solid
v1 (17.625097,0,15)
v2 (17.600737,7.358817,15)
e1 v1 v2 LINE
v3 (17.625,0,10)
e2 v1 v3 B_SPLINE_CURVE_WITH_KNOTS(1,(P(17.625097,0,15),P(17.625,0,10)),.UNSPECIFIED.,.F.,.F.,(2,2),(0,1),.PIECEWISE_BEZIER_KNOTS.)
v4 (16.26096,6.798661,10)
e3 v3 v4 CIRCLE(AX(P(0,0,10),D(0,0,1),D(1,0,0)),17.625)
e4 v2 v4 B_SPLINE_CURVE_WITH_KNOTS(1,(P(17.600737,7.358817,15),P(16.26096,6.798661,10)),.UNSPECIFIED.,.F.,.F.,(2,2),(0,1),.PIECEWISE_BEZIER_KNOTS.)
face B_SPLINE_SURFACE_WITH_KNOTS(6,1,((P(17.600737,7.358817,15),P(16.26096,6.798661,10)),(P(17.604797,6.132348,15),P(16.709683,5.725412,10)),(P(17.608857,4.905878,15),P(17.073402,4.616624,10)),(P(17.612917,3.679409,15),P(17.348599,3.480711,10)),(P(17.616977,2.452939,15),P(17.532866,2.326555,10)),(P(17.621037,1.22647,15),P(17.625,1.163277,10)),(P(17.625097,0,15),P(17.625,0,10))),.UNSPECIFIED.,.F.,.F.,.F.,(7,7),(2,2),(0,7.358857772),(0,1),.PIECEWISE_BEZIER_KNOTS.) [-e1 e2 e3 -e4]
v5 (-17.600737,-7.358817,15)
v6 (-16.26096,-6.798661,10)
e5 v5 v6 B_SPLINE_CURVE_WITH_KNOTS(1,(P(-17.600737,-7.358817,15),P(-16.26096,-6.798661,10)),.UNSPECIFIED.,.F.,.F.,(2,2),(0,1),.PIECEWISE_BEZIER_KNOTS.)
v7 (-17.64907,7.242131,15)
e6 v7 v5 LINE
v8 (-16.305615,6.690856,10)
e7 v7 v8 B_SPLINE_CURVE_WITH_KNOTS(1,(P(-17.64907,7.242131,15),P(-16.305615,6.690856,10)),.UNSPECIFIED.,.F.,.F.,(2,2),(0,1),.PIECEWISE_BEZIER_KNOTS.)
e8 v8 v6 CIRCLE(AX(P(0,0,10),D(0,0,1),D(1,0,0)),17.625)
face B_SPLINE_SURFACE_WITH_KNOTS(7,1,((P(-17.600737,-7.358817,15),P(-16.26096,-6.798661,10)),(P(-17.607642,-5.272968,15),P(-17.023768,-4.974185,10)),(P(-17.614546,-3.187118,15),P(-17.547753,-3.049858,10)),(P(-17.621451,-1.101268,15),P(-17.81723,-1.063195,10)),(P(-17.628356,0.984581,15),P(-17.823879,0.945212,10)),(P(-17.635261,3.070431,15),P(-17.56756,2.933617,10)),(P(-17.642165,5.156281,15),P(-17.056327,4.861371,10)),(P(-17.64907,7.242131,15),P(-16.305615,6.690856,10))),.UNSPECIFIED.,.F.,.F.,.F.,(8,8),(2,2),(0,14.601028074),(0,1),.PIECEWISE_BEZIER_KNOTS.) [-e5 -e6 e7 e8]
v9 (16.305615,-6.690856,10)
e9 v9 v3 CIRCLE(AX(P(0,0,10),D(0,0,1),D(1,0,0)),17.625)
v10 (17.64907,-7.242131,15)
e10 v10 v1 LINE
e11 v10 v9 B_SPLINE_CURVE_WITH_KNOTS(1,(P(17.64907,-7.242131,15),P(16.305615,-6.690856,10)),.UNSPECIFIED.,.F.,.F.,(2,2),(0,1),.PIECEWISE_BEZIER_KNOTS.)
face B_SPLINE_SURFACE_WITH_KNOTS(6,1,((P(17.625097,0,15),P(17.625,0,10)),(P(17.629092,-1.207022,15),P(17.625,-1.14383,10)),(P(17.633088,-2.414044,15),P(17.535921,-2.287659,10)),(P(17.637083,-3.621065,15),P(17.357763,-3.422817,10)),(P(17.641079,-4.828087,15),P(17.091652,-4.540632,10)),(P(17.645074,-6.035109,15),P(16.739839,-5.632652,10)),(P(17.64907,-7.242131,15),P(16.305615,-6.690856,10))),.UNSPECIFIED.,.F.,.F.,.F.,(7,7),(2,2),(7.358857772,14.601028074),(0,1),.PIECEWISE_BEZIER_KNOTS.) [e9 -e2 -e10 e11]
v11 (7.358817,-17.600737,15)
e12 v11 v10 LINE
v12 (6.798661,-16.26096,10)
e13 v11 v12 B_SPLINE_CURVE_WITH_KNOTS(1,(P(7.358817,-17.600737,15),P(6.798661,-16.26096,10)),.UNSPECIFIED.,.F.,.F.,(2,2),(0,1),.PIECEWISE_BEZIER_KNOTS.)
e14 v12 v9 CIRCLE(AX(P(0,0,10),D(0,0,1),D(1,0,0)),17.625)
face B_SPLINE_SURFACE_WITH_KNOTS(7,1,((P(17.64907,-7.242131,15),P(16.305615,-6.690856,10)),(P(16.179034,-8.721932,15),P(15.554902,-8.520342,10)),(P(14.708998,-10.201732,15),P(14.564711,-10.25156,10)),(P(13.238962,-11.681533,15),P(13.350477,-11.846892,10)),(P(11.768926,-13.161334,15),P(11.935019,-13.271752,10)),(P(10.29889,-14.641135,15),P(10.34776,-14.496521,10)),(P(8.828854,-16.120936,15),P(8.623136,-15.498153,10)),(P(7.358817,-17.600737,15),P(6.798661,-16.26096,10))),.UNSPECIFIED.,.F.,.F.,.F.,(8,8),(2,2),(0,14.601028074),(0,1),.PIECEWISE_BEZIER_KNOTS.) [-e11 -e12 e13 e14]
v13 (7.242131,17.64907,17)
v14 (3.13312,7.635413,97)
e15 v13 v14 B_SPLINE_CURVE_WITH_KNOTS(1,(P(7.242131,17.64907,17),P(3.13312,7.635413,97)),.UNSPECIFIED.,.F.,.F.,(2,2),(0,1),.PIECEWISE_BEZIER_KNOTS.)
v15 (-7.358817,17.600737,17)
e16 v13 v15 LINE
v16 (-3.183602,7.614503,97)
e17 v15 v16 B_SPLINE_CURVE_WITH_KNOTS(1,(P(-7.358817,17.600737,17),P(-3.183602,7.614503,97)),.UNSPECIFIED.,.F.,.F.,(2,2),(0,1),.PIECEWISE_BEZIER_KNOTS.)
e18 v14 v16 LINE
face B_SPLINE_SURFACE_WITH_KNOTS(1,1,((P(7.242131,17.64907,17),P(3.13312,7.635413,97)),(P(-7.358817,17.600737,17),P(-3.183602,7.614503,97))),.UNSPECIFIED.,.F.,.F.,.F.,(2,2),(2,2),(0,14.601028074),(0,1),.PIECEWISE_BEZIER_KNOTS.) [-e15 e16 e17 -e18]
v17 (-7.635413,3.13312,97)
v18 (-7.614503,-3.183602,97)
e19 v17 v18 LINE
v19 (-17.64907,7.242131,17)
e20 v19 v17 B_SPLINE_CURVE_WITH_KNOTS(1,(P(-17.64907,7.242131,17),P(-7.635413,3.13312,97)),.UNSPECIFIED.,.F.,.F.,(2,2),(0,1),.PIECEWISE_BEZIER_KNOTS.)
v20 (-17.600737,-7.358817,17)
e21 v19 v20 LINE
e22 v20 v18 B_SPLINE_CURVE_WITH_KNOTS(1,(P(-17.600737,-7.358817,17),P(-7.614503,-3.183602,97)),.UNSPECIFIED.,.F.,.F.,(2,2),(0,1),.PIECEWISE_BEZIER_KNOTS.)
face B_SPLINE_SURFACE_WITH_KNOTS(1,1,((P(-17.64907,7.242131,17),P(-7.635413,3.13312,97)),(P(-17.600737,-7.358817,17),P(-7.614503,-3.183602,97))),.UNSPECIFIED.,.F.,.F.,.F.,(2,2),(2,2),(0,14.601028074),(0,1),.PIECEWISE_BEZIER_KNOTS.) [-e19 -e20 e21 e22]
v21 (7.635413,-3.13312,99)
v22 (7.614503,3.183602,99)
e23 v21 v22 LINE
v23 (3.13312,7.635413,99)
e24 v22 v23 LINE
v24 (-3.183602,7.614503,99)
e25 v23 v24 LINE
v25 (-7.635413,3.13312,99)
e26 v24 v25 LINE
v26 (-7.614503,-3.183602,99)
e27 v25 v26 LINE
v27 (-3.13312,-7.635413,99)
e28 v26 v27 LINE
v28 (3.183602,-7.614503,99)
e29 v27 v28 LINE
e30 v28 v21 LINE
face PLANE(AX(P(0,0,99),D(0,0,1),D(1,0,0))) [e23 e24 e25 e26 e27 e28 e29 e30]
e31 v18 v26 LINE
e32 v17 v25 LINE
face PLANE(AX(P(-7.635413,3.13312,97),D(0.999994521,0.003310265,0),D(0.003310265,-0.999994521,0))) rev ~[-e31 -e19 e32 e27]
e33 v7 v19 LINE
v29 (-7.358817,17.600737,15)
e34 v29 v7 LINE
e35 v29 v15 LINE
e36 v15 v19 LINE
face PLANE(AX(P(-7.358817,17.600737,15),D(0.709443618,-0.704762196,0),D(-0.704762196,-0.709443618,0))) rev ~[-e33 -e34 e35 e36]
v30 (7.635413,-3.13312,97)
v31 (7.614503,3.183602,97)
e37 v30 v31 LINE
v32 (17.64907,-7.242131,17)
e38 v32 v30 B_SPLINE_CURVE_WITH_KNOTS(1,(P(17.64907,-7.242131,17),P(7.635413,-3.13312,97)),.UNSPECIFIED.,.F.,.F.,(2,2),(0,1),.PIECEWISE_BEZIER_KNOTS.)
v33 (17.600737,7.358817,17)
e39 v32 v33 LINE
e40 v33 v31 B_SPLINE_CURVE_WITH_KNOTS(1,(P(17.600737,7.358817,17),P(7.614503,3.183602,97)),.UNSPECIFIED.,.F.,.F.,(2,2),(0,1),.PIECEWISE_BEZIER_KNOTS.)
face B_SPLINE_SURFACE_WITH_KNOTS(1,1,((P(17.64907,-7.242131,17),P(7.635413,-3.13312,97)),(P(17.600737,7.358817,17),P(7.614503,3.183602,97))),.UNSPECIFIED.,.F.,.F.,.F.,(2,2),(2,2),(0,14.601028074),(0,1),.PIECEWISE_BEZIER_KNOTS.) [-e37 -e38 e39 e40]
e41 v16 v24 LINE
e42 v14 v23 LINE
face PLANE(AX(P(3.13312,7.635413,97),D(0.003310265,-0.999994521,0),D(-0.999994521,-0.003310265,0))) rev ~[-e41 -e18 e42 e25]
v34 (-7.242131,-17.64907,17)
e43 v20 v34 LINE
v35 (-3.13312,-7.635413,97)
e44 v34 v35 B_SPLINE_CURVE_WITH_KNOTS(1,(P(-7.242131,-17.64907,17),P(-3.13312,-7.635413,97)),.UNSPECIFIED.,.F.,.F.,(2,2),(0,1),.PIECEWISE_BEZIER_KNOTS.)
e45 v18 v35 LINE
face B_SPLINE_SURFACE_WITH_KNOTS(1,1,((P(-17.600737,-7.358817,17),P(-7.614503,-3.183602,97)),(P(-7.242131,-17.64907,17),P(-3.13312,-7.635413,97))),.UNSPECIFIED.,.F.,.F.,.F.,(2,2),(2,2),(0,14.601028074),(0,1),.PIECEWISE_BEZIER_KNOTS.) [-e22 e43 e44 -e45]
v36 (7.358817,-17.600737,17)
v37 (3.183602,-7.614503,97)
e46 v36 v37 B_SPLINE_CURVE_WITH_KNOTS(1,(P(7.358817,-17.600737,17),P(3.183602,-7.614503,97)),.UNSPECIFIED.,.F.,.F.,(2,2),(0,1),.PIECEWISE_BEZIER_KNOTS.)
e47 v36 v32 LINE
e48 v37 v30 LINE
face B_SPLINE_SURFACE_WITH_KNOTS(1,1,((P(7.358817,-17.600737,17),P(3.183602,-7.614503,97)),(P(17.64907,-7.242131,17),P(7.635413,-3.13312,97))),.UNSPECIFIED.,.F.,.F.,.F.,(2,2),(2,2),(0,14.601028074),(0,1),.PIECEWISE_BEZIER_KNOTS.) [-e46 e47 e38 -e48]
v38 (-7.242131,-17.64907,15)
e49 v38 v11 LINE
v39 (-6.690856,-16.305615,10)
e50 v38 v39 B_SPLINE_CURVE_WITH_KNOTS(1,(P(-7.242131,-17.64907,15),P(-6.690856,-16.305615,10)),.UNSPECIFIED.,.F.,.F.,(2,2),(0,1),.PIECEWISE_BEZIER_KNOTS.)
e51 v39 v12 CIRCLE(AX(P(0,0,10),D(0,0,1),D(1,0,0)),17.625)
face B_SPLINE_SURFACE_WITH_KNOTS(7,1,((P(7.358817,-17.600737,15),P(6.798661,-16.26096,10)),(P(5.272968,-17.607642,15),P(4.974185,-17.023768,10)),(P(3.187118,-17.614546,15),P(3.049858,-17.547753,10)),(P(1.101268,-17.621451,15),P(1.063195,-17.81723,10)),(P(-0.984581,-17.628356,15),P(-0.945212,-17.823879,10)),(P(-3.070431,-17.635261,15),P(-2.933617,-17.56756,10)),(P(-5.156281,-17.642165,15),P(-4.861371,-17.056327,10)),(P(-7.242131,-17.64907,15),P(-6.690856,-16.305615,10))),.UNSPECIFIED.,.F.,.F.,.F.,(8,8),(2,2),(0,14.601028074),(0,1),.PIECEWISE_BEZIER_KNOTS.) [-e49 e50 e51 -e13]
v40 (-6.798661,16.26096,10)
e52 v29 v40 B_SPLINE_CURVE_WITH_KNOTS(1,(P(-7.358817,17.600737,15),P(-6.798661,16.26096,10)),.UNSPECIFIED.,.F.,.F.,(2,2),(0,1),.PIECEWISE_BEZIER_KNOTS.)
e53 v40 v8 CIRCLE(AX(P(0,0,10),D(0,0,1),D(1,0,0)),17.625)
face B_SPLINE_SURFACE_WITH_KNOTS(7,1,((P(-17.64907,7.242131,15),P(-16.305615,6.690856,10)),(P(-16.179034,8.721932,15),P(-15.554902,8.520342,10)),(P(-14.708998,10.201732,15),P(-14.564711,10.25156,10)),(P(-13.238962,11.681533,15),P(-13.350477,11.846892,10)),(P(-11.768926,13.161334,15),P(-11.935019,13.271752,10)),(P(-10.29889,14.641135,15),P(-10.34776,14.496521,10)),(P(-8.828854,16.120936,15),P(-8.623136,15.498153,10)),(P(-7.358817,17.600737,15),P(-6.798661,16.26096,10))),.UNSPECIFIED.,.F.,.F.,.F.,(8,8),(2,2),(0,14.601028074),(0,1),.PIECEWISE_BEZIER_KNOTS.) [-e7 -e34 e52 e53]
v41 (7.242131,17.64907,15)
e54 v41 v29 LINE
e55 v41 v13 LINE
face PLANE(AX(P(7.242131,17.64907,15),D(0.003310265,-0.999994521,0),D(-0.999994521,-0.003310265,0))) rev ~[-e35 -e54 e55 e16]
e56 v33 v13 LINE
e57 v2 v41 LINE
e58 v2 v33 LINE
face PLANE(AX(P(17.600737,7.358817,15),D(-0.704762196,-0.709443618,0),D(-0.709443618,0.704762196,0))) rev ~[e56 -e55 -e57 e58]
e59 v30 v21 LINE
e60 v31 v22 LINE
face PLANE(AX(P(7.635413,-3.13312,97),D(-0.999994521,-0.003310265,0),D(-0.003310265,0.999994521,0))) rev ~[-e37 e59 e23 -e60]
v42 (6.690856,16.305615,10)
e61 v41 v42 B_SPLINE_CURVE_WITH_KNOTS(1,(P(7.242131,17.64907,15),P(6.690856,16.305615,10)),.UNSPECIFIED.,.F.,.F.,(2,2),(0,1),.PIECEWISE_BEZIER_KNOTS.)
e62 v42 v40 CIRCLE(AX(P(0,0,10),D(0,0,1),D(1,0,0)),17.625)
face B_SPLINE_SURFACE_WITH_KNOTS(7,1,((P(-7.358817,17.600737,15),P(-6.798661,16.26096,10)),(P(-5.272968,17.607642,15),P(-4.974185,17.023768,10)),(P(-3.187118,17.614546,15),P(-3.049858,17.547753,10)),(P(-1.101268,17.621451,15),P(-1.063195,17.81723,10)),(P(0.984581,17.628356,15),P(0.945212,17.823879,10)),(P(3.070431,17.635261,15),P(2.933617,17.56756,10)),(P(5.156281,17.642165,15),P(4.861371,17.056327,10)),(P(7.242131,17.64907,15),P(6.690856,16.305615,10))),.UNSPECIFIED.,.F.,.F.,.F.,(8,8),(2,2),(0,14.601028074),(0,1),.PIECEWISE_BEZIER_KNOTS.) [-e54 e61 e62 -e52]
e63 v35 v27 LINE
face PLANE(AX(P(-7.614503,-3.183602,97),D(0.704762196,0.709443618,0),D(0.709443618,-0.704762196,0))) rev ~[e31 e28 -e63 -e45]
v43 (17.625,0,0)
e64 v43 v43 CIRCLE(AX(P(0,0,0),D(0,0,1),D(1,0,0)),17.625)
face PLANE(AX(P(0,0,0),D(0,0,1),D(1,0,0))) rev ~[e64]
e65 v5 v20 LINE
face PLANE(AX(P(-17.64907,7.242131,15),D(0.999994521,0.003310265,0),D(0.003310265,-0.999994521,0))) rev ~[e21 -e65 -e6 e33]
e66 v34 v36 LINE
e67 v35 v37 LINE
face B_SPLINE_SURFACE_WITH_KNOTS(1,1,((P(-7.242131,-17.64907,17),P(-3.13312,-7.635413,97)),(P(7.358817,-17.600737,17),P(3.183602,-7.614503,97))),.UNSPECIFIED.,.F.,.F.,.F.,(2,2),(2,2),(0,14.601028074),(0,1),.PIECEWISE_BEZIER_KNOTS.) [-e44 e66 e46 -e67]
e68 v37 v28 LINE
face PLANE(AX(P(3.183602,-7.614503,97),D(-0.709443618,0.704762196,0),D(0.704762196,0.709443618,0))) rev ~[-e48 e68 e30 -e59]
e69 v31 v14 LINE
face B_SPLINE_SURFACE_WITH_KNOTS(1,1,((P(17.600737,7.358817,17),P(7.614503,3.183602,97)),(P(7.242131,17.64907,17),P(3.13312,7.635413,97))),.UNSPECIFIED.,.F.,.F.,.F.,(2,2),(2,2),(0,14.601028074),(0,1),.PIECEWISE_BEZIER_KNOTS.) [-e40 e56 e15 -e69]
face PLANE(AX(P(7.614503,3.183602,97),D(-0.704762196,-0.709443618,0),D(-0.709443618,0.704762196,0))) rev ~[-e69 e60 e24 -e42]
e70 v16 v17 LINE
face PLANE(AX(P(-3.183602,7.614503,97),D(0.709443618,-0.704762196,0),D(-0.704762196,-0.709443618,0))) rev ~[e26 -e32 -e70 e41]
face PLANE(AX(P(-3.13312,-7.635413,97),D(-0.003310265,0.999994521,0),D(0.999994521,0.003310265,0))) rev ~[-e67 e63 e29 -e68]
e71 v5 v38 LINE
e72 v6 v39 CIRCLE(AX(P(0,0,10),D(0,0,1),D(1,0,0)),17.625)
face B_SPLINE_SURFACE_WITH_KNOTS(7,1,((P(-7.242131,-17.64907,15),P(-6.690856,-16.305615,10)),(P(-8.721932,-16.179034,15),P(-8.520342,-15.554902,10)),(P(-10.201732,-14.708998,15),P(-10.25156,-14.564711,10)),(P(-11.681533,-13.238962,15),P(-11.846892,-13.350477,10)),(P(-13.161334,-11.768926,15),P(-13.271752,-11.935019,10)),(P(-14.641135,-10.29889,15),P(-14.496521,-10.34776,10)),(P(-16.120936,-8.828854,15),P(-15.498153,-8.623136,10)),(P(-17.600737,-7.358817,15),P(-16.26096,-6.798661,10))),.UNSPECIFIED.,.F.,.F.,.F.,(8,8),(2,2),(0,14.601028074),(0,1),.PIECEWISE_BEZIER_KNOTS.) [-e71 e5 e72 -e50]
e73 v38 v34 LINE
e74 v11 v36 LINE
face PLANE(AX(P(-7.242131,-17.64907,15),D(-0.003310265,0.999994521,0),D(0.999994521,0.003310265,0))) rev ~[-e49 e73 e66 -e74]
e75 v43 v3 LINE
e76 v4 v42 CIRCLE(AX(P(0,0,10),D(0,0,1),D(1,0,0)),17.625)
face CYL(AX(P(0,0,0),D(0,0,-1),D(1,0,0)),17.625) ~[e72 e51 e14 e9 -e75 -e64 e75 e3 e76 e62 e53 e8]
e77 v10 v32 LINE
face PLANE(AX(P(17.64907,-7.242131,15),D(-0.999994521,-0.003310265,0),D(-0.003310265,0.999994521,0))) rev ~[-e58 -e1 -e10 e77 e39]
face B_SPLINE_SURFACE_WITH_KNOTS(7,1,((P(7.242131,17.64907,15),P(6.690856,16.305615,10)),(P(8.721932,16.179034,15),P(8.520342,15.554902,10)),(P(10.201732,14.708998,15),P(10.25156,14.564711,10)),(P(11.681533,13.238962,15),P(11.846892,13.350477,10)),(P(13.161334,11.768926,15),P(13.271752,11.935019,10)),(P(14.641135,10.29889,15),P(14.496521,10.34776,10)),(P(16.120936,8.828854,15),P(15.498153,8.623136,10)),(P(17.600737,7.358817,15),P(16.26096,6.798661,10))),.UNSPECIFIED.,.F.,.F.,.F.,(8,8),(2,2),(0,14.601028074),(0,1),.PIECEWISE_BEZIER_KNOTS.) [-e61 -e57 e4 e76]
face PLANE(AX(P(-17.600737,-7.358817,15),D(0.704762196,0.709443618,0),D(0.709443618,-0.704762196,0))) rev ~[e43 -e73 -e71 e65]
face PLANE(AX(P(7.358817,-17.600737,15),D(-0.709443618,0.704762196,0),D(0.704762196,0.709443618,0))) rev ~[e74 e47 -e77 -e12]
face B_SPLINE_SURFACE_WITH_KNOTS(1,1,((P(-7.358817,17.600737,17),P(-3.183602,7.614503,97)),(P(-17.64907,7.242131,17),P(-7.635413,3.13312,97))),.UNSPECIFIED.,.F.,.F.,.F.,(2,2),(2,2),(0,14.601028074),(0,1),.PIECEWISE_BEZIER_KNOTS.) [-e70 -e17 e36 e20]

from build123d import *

# Parameters (mm, degrees)
F0_R      = 17.625
F1_DEPTH  = 10
F3_START  = 5
F3_DEPTH  = 2
F6_DEPTH  = 2
F1_FACE_R = 17.625


# Not quite as in the source:
# - a feature names something its author has since deleted; it is built from what else it names


with BuildPart() as f1:
    # F0 (on Top) → F1 (new body)
    with BuildSketch(Plane.XY):
        Circle(F0_R)
    extrude(amount=F1_DEPTH)



with BuildPart() as f3:
    # F2 (on face) → F3 (new body)
    with BuildSketch(Plane.XY.offset(10).offset(F3_START)):
        Polygon((7.3588174532, -17.6007367997), (17.6490700676, -7.2421306223), (17.6007367997, 7.3588174532), (7.2421306223, 17.6490700676), (-7.3588174532, 17.6007367997), (-17.6490700676, 7.2421306223), (-17.6007367997, -7.3588174532), (-7.2421306223, -17.6490700676), align=None)
    extrude(amount=F3_DEPTH)



with BuildPart() as f6:
    # F5 (on offset) → F6 (new body)
    with BuildSketch(Plane.XY.offset(97)):
        Polygon((-7.6354132917, 3.1331203401), (-7.6145031545, -3.1836018769), (-3.1331203401, -7.6354132917), (3.1836018769, -7.6145031545), (7.6354132917, -3.1331203401), (7.6145031545, 3.1836018769), (3.1331203401, 7.6354132917), (-3.1836018769, 7.6145031545), align=None)
    extrude(amount=F6_DEPTH)


with BuildPart() as f3_1:
    add(f3.part)

    add(f6.part)  # F7 merges F6
    # F3_face (on face) → F7 section 0
    with BuildSketch(Plane.XY.offset(17)):
        Polygon((-17.6007367997, -7.3588174532), (-7.2421306223, -17.6490700676), (7.3588174532, -17.6007367997), (17.6490700676, -7.2421306223), (17.6007367997, 7.3588174532), (7.2421306223, 17.6490700676), (-7.3588174532, 17.6007367997), (-17.6490700676, 7.2421306223), align=None)
    # F6_face (on face) → F7 section 1
    with BuildSketch(Plane(origin=(0, 0, 97), x_dir=(1, 0, 0), z_dir=(0, 0, -1))):
        Polygon((-3.1836018769, -7.6145031545), (3.1331203401, -7.6354132917), (7.6145031545, -3.1836018769), (7.6354132917, 3.1331203401), (3.1836018769, 7.6145031545), (-3.1331203401, 7.6354132917), (-7.6145031545, 3.1836018769), (-7.6354132917, -3.1331203401), align=None)
    loft()


with BuildPart() as f1_1:
    add(f1.part)

    add(f3_1.part)  # F8 merges F3
    # F3_face1 (on face) → F8 section 0
    with BuildSketch(Plane(origin=(0, 0, 15), x_dir=(1, 0, 0), z_dir=(0, 0, -1))):
        Polygon((-7.2421306223, 17.6490700676), (-17.6007367997, 7.3588174532), (-17.6490700676, -7.2421306223), (-7.3588174532, -17.6007367997), (7.2421306223, -17.6490700676), (17.6007367997, -7.3588174532), (17.6490700676, 7.2421306223), (7.3588174532, 17.6007367997), align=None)
    # F1_face (on face) → F8 section 1
    with BuildSketch(Plane.XY.offset(10)):
        Circle(F1_FACE_R)
    loft()


solid = f1_1.part
